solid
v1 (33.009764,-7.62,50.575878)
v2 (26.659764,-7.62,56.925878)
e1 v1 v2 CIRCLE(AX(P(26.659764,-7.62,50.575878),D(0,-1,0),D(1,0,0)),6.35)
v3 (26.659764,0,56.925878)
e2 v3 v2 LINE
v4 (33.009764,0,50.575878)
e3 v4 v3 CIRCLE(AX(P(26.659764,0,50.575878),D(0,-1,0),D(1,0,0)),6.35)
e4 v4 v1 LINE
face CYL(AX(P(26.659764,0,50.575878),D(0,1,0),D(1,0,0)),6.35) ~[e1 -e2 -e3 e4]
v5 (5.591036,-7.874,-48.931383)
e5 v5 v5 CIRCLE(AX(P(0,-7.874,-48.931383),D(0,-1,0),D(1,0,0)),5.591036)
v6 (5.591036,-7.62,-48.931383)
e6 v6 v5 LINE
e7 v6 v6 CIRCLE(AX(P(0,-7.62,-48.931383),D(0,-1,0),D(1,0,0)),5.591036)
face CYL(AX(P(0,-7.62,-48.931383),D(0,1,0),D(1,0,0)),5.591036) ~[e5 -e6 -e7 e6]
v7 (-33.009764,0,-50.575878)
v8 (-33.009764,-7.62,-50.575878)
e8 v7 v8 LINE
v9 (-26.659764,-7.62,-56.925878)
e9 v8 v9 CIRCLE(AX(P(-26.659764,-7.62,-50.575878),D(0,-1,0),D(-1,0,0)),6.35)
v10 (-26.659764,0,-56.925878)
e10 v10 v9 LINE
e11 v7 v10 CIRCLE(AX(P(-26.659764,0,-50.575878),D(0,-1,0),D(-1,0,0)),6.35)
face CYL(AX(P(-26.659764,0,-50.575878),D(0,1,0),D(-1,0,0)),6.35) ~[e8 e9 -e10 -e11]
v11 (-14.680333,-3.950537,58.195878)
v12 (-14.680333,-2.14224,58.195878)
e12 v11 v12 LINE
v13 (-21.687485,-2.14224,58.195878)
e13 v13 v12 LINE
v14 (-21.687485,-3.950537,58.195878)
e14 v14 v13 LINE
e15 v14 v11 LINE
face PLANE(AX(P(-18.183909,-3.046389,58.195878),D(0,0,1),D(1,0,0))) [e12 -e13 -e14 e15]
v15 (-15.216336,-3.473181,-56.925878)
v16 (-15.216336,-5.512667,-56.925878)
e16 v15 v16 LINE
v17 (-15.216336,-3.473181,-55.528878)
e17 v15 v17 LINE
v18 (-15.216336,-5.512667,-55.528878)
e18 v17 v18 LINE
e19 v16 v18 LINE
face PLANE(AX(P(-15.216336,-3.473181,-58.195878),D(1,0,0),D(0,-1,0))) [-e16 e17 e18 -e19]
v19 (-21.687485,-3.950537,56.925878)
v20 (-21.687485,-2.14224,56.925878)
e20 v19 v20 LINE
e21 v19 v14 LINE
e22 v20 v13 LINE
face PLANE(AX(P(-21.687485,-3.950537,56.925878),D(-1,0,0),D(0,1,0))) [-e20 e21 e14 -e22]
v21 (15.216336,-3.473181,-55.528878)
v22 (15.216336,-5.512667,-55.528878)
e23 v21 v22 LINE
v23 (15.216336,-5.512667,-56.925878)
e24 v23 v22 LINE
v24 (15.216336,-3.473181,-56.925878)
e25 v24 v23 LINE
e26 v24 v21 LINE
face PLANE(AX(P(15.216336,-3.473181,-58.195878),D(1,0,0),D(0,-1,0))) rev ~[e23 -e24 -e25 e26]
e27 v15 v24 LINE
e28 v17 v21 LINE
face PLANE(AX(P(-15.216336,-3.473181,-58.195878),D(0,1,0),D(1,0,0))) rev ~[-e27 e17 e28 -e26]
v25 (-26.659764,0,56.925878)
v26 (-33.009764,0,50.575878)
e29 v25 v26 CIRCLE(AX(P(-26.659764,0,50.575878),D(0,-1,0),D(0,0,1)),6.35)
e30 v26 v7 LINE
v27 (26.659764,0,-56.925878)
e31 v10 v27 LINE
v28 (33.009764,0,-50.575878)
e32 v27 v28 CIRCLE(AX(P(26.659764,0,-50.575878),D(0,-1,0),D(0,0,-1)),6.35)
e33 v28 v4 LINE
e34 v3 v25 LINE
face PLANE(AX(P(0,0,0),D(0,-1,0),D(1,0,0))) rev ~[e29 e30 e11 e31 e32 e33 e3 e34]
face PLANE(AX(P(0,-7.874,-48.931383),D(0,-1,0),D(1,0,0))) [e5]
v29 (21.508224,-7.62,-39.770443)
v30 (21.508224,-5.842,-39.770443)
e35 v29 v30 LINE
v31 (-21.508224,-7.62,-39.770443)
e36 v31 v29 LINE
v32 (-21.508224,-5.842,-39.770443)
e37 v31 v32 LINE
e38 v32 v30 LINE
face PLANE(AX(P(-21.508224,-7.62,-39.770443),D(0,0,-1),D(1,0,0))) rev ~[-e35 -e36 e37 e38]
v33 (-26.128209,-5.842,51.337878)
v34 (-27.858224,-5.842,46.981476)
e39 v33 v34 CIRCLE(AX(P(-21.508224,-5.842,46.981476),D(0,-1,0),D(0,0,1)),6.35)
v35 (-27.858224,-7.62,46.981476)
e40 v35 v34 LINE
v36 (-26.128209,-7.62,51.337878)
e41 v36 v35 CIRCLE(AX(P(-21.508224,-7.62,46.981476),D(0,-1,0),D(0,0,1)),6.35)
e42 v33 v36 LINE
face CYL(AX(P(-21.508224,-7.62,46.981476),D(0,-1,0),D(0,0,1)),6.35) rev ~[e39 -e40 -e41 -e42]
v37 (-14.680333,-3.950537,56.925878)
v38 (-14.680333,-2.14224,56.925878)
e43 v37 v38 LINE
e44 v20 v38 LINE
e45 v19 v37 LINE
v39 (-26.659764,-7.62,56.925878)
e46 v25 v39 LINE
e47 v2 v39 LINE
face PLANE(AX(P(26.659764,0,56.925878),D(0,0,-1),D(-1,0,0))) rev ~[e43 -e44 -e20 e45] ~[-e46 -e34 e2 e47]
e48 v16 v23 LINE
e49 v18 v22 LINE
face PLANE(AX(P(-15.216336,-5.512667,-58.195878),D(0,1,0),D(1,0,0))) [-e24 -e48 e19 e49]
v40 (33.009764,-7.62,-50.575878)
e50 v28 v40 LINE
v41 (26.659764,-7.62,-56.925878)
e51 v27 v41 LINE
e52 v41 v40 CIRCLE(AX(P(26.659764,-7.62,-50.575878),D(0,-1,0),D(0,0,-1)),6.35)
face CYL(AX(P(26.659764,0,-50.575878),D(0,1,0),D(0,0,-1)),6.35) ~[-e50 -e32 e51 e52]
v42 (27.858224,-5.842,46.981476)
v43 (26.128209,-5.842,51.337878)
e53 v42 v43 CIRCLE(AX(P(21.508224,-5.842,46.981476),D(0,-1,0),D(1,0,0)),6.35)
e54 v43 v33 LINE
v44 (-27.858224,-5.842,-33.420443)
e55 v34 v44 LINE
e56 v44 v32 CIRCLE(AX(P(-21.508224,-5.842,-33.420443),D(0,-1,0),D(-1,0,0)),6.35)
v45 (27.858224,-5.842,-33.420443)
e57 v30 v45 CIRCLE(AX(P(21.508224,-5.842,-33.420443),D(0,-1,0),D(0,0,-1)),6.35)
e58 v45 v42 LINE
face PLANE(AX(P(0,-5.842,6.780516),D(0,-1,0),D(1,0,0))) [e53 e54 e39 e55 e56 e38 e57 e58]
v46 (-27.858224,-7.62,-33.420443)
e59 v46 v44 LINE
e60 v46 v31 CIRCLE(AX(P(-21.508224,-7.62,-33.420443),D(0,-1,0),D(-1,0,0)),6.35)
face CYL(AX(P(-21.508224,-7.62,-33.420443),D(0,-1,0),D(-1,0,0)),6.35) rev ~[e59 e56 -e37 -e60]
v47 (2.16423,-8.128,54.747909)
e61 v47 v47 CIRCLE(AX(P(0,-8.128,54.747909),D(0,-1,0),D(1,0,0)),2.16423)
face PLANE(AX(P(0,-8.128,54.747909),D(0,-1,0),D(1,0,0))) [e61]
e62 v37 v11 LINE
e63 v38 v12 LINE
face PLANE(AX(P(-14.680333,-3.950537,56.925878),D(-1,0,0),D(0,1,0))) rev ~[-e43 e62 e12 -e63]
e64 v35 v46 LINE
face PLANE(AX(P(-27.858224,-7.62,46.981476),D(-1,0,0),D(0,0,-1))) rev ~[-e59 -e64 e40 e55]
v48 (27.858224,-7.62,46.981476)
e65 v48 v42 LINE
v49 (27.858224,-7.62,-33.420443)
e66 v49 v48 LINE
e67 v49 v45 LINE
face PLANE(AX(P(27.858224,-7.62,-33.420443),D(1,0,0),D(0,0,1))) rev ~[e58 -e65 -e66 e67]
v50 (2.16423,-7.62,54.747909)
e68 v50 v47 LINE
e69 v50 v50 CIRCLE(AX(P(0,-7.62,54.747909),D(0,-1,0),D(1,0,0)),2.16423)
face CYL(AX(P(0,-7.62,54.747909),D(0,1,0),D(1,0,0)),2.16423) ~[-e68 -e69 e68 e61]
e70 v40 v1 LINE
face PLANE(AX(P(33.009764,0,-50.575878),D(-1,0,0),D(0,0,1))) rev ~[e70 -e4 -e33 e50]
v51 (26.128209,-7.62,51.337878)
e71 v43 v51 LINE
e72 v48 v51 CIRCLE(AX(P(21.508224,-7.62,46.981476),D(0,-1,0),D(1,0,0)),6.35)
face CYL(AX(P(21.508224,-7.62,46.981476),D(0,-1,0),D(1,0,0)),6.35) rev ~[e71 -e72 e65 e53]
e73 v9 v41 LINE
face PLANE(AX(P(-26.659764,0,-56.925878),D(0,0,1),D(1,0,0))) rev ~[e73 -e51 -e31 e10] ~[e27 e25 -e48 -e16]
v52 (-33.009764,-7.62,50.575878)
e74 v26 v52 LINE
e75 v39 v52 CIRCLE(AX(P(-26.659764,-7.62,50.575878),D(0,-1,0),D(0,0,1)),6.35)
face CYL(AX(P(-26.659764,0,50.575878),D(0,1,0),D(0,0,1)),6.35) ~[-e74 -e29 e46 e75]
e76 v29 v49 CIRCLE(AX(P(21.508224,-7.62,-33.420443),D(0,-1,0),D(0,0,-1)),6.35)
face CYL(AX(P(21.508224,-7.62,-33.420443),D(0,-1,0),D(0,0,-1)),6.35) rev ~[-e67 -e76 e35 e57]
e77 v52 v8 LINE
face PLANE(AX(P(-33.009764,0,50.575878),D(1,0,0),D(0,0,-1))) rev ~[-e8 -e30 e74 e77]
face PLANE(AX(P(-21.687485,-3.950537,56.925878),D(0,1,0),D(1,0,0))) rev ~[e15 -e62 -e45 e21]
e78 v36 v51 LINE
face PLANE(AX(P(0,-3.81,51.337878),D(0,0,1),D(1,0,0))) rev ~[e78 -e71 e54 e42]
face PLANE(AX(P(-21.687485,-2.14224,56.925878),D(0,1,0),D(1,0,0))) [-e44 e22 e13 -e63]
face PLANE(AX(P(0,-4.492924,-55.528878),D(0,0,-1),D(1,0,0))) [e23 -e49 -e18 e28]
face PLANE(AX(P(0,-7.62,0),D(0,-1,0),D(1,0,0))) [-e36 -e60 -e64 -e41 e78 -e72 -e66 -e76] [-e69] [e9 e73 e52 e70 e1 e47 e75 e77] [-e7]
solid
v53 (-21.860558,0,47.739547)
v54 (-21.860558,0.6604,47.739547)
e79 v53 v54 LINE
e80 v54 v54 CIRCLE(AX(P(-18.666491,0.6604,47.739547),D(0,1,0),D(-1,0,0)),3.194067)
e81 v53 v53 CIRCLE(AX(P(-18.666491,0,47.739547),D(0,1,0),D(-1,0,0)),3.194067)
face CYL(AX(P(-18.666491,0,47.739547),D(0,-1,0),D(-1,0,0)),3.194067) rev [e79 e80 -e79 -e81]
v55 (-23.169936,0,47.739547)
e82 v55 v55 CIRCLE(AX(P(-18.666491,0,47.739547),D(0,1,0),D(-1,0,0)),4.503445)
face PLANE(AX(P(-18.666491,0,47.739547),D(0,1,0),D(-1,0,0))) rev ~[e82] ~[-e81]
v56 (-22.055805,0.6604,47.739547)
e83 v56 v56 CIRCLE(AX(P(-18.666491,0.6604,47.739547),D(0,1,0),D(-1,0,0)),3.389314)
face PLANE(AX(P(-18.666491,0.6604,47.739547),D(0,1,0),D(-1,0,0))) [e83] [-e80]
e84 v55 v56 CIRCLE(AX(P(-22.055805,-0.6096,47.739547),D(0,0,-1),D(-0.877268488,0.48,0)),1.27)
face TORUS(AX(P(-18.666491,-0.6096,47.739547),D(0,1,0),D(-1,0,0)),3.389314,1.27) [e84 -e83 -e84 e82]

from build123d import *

# Parameters (mm, degrees)
F1_DEPTH   = 7.62
F3_DEPTH   = 1.778
F4_R       = 5.5910358915
F6_DEPTH   = 0.254
F11_W      = 5.8401450515
F11_H      = 0.8899270086
F12_DEPTH  = 0.254
F13_W      = 53.3195276141
F13_H      = 7.62
F13_W_2    = 3.7960950285
F13_H_2    = 0.8621166
F14_DEPTH  = 5.588
F15_W      = 5.4543595761
F15_H      = 1.4679813758
F16_DEPTH  = 2.921
F17_W      = 7.0071518421
F17_H      = 1.8082973547
F18_DEPTH  = 1.27
F19_R      = 2.1642296788
F20_DEPTH  = 0.508
F21_R      = 3.8279673228
F22_DEPTH  = 2.286
F23_R      = 4.5034446875
F23_R_2    = 3.1940667159
F24_DEPTH  = 0.6604
F26_W      = 9.0522272512
F26_H      = 1.7520438414
F27_DEPTH  = 12.192
F1_FACE2_W = 53.3195276141
F1_FACE2_H = 7.62
F28_DEPTH  = 1.27
F29_W      = 17.2284310684
F29_H      = 1.4600362629
F30_DEPTH  = 3.048
F31_W      = 53.3195276141
F31_H      = 7.62
F31_W_2    = 12.5563140027
F31_H_2    = 1.4600367285
F32_DEPTH  = 1.27
F33_W      = 30.4326713085
F33_H      = 2.039485611
F34_DEPTH  = 1.27
F35_DEPTH  = 2.667


# Not quite as in the source:
# - a fillet or chamfer that OpenCascade refuses, or shapes differently, is made with other operations: its cross-section is extruded or revolved along the edge and cut away or added
# - the program builds the solid bodies; features that only make, move or delete a surface that nothing else refers to are left out


with BuildPart() as f1:
    # F0 (on Front) → F1 (new body)
    with BuildSketch(Plane.XZ):
        with BuildLine():
            ThreePointArc((33.0097638071, 50.5758779287), (31.1498918676, 55.0660059893), (26.6597638071, 56.9258779287))
            Line((26.6597638071, 56.9258779287), (-26.6597638071, 56.9258779287))
            ThreePointArc((-26.6597638071, 56.9258779287), (-31.1498918676, 55.0660059893), (-33.0097638071, 50.5758779287))
            Line((-33.0097638071, 50.5758779287), (-33.0097638071, -50.5758779287))
            ThreePointArc((-33.0097638071, -50.5758779287), (-31.1498918676, -55.0660059893), (-26.6597638071, -56.9258779287))
            Line((-26.6597638071, -56.9258779287), (26.6597638071, -56.9258779287))
            ThreePointArc((26.6597638071, -56.9258779287), (31.1498918676, -55.0660059893), (33.0097638071, -50.5758779287))
            Line((33.0097638071, -50.5758779287), (33.0097638071, 50.5758779287))
        make_face()
    extrude(amount=F1_DEPTH)

    # F2 (on face) → F3 (cut)
    with BuildSketch(Plane.XZ.offset(7.62)):
        with BuildLine():
            ThreePointArc((27.8582237661, 46.9814757049), (25.9983518266, 51.4716037654), (21.5082237661, 53.3314757049))
            Line((21.5082237661, 53.3314757049), (-21.5082237661, 53.3314757049))
            ThreePointArc((-21.5082237661, 53.3314757049), (-25.9983518266, 51.4716037654), (-27.8582237661, 46.9814757049))
            Line((-27.8582237661, 46.9814757049), (-27.8582237661, -33.4204429924))
            ThreePointArc((-27.8582237661, -33.4204429924), (-25.9983518266, -37.910571053), (-21.5082237661, -39.7704429924))
            Line((-21.5082237661, -39.7704429924), (21.5082237661, -39.7704429924))
            ThreePointArc((21.5082237661, -39.7704429924), (25.9983518266, -37.910571053), (27.8582237661, -33.4204429924))
            Line((27.8582237661, -33.4204429924), (27.8582237661, 46.9814757049))
        make_face()
    extrude(amount=-F3_DEPTH, mode=Mode.SUBTRACT)

    # F4 (on face) → F6 (join)
    with BuildSketch(Plane.XZ.offset(7.62)):
        with Locations((0, -48.9313825965)):
            Circle(F4_R)
    extrude(amount=F6_DEPTH)

    # F11 (on face) → F12 (join)
    with BuildSketch(Plane.XY.offset(56.9258779287)):
        with Locations((20.8248868585, -3.3650364957)):
            Rectangle(F11_W, F11_H)
    extrude(amount=-F12_DEPTH)

    # F13 (on face) → F14 (join)
    with BuildSketch(Plane.XY.offset(56.9258779287)):
        with Locations((0, -3.81)):
            Rectangle(F13_W, F13_H)
        with Locations((21.5549049899, -4.2410583)):
            Rectangle(F13_W_2, F13_H_2, mode=Mode.SUBTRACT)
    extrude(amount=-F14_DEPTH)

    # F15 (on face) → F16 (join)
    with BuildSketch(Plane.XY.offset(56.9258779287)):
        with Locations((18.7206258997, -3.3238437027)):
            Rectangle(F15_W, F15_H)
    extrude(amount=-F16_DEPTH)

    # F17 (on face) → F18 (join)
    with BuildSketch(Plane.XY.offset(56.9258779287)):
        with Locations((-18.1839093566, -3.046388505)):
            Rectangle(F17_W, F17_H)
    extrude(amount=F18_DEPTH)

    # F19 (on face) → F20 (join)
    with BuildSketch(Plane.XZ.offset(7.62)):
        with Locations((0, 54.7479093075)):
            Circle(F19_R)
    extrude(amount=F20_DEPTH)

    # F21 (on face) → F22 (join)
    with BuildSketch(Plane(origin=(0, 0, 0), x_dir=(-1, 0, 0), z_dir=(0, 1, 0))):
        with Locations((24.0557044744, 50.6977252662)):
            Circle(F21_R)
    extrude(amount=-F22_DEPTH)

    # F26 (on face) → F27 (join)
    with BuildSketch(Plane(origin=(0, 0, -56.9258779287), x_dir=(1, 0, 0), z_dir=(0, 0, -1))):
        with Locations((1.1143940501, 4.3801093707)):
            Rectangle(F26_W, F26_H)
    extrude(amount=-F27_DEPTH)

    # F1_face2 (on face) + F26 (on face) → F28 (join)
    with BuildSketch(Plane(origin=(0, -3.81, -56.9258779287), x_dir=(1, 0, 0), z_dir=(0, 0, -1))):
        Rectangle(F1_FACE2_W, F1_FACE2_H)
    with BuildSketch(Plane(origin=(0, 0, -56.9258779287), x_dir=(1, 0, 0), z_dir=(0, 0, -1))):
        with Locations((1.1143940501, 4.3801093707)):
            Rectangle(F26_W, F26_H)
    extrude(amount=-F28_DEPTH)

    # F29 (on face) → F30 (join)
    with BuildSketch(Plane(origin=(0, 0, -56.9258779287), x_dir=(1, 0, 0), z_dir=(0, 0, -1))):
        with Locations((1.1143931188, 4.52611316)):
            Rectangle(F29_W, F29_H)
    extrude(amount=-F30_DEPTH)

    # F31 (on face) → F32 (join)
    with BuildSketch(Plane(origin=(0, 0, -56.9258779287), x_dir=(1, 0, 0), z_dir=(0, 0, -1))):
        with Locations((0, 3.81)):
            Rectangle(F31_W, F31_H)
        with Locations((2.5744300801, 4.8181207385)):
            Rectangle(F31_W_2, F31_H_2, mode=Mode.SUBTRACT)
    extrude(amount=-F32_DEPTH)

    # F33 (on face) → F34 (join)
    with BuildSketch(Plane(origin=(0, 0, -56.9258779287), x_dir=(1, 0, 0), z_dir=(0, 0, -1))):
        with Locations((0, 4.492924083)):
            Rectangle(F33_W, F33_H)
    extrude(amount=F34_DEPTH)

    # F35 (cut): a face of the model
    f35_faces = [f1.faces().sort_by_distance(p)[0] for p in [
        (0, -4.492924083, -58.1958779287),
    ]]
    extrude(f35_faces, amount=-F35_DEPTH, mode=Mode.SUBTRACT)


with BuildPart() as f24:
    # F23 (on face) → F24 (new body)
    with BuildSketch(Plane(origin=(0, 0, 0), x_dir=(-1, 0, 0), z_dir=(0, 1, 0))):
        with Locations((18.6664909124, 47.739546746)):
            Circle(F23_R)
        with Locations((18.6664909124, 47.739546746)):
            Circle(F23_R_2, mode=Mode.SUBTRACT)
    extrude(amount=F24_DEPTH)

    # F25: fillet of radius 1.27 on 1 edges, made by hand

    # F25_s1 → F25_t2 (revolve, cut)
    with BuildSketch(Plane.XY.offset(47.739546746)):
        with BuildLine():
            ThreePointArc((-23.1699356, 0), (-22.7033800985, 0.4828953089), (-22.0558046202, 0.6604))
            Line((-22.0558046202, 0.6604), (-23.1699356, 0.6604))
            Line((-23.1699356, 0.6604), (-23.1699356, 0))
        make_face()
    revolve(axis=Axis((-18.6664909124, 0.6604, 47.739546746), (0, 1, 0)), mode=Mode.SUBTRACT)


solid = Compound([f1.part, f24.part])
